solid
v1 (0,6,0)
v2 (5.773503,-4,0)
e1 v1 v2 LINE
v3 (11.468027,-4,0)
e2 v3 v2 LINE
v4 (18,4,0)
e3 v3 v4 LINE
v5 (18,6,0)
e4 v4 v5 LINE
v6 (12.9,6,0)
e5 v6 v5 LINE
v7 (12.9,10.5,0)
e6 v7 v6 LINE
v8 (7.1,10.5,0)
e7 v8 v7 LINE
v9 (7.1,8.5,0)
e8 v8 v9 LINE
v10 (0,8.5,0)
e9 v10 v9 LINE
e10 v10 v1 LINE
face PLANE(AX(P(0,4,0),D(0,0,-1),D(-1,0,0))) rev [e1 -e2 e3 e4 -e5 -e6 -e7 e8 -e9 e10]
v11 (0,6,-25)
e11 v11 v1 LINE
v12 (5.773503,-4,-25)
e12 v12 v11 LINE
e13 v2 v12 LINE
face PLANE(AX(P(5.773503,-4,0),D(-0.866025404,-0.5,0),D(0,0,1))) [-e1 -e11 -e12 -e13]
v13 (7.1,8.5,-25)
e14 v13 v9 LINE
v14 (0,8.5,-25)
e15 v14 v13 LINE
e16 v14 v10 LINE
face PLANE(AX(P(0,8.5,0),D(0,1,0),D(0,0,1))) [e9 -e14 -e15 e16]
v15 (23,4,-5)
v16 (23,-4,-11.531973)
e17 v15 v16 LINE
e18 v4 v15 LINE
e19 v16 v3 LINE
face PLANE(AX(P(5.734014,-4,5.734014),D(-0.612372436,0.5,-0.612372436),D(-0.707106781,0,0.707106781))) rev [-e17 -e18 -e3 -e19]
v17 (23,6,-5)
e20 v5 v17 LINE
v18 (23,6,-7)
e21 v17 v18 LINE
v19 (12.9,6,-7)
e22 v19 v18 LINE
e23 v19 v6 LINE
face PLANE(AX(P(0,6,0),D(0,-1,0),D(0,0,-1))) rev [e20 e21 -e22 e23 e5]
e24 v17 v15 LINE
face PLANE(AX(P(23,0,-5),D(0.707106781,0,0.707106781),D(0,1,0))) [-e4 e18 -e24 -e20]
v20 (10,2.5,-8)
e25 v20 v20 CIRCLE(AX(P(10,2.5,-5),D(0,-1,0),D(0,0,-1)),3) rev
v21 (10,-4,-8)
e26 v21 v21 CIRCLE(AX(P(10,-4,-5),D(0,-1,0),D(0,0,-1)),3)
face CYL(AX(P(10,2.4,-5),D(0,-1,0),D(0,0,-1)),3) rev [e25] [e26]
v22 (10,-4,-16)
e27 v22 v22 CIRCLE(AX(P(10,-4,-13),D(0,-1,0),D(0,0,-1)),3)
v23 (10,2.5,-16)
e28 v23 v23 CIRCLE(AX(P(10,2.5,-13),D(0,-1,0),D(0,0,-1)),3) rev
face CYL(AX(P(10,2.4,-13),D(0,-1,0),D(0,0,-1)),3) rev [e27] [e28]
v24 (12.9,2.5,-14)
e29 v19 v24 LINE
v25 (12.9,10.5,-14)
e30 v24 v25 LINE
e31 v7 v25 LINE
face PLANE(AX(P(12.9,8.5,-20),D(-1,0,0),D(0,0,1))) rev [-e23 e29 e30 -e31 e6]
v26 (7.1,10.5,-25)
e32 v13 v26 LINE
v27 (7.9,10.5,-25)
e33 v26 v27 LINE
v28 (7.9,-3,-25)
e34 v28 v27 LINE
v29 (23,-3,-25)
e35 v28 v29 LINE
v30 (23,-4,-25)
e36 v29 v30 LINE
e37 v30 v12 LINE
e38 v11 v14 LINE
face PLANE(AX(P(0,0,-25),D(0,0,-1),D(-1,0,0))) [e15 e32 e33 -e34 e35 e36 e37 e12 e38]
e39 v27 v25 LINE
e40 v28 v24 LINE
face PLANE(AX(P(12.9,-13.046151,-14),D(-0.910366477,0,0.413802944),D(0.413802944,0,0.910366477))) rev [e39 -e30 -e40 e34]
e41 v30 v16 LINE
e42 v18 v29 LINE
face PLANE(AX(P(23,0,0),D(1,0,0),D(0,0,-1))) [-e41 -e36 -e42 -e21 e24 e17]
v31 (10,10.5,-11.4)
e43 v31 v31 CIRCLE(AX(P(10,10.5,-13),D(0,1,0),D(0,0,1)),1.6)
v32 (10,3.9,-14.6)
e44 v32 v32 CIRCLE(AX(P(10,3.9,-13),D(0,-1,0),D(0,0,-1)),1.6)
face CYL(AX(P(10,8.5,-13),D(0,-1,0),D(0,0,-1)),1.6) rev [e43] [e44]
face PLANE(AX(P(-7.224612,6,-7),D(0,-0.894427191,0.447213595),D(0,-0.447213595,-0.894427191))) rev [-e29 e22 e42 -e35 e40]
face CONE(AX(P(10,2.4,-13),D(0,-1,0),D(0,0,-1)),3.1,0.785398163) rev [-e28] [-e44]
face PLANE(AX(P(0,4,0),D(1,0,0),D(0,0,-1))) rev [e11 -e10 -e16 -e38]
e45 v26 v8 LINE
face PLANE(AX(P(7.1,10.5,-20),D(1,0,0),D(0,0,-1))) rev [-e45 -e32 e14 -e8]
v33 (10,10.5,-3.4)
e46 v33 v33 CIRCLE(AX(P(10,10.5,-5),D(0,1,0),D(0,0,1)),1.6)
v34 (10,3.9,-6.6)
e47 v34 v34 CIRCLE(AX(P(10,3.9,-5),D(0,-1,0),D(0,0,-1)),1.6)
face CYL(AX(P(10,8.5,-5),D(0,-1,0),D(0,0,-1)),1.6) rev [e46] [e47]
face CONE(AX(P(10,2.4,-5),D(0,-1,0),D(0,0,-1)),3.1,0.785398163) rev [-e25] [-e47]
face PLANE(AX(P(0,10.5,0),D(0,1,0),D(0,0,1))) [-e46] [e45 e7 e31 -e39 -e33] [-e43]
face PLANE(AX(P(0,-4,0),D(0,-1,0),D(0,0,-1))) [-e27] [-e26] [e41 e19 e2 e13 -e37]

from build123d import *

# Parameters (mm, degrees)
SKETCH_1_W           = 20
SKETCH_1_H           = 20
EXTRUDE_1_DEPTH      = 4
SKETCH_2_W           = 12.9
SKETCH_2_H           = 20
EXTRUDE_2_DEPTH      = 4.5
SKETCH_3_R           = 1.6
CUT_EXTRUDE_1_DEPTH  = 30.533878851
SKETCH_4_W           = 5.8
SKETCH_4_H           = 20
SKETCH_4_R           = 1.6
EXTRUDE_3_DEPTH      = 2
SKETCH_5_R           = 3
CUT_EXTRUDE_3_DEPTH  = 2.4
SKETCH_6_W           = 20
SKETCH_6_H           = 4
EXTRUDE_4_DEPTH      = 3
EXTRUDE_START        = 4
SKETCH_7_W           = 23
SKETCH_7_H           = 20
SKETCH_7_R           = 3
EXTRUDE_5_DEPTH      = 4
SKETCH_9_W           = 10.1
SKETCH_9_H           = 20
EXTRUDE_6_DEPTH      = 2
EXTRUDE_7_DEPTH      = 5
CHAMFER_7_SIZE       = 10
CHAMFER_7_SIZE2      = 5.773502692
CHAMFER_8_SIZE       = 5
CHAMFER_9_SIZE       = 8
CHAMFER_9_SIZE2      = 4.618802154
CUT_EXTRUDE_9_DEPTH  = 10.1
CUT_EXTRUDE_10_REACH = 38.936
CHAMFER_10_SIZE      = 1.5


with BuildPart() as part:
    # 草图1 → 凸台-拉伸1 (new body)
    with BuildSketch(Plane(origin=(0, 0, 0), x_dir=(1, 0, 0), z_dir=(0, 1, 0))):
        with Locations((10, 10)):
            Rectangle(SKETCH_1_W, SKETCH_1_H)
    extrude(amount=EXTRUDE_1_DEPTH)

    # 草图2 → 凸台-拉伸2 (add)
    with BuildSketch(Plane(origin=(0, 4, 0), x_dir=(1, 0, 0), z_dir=(0, 1, 0))):
        with Locations((6.45, 10)):
            Rectangle(SKETCH_2_W, SKETCH_2_H)
    extrude(amount=EXTRUDE_2_DEPTH)

    # 草图3 → 切除-拉伸1 (cut, through all)
    with BuildSketch(Plane(origin=(0, 0, 0), x_dir=(-1, 0, 0), z_dir=(0, -1, 0))):
        with Locations(Location((-10, 5, 0), (0, 0, 90))):
            Circle(SKETCH_3_R)
        with Locations(Location((-10, 13, 0), (0, 0, 90))):
            Circle(SKETCH_3_R)
    extrude(amount=-CUT_EXTRUDE_1_DEPTH, mode=Mode.SUBTRACT)

    # 草图4 → 凸台-拉伸3 (add)
    with BuildSketch(Plane(origin=(0, 8.5, 0), x_dir=(1, 0, 0), z_dir=(0, 1, 0))):
        with Locations((10, 10)):
            Rectangle(SKETCH_4_W, SKETCH_4_H)
        with Locations(Location((10, 13, 0), (0, 0, 90))):
            Circle(SKETCH_4_R, mode=Mode.SUBTRACT)
        with Locations(Location((10, 5, 0), (0, 0, 90))):
            Circle(SKETCH_4_R, mode=Mode.SUBTRACT)
    extrude(amount=EXTRUDE_3_DEPTH)

    # 草图5 → 切除-拉伸3 (cut)
    with BuildSketch(Plane(origin=(0, 0, 0), x_dir=(-1, 0, 0), z_dir=(0, -1, 0))):
        with Locations(Location((-10, 5, 0), (0, 0, 90))):
            Circle(SKETCH_5_R)
        with Locations(Location((-10, 13, 0), (0, 0, 90))):
            Circle(SKETCH_5_R)
    extrude(amount=-CUT_EXTRUDE_3_DEPTH, mode=Mode.SUBTRACT)

    # 草图6 → 凸台-拉伸4 (add)
    with BuildSketch(Plane(origin=(20, 0, 0), x_dir=(0, 0, -1), z_dir=(1, 0, 0))):
        with Locations((10, 2)):
            Rectangle(SKETCH_6_W, SKETCH_6_H)
    extrude(amount=EXTRUDE_4_DEPTH)

    # 草图7 → 凸台-拉伸5 (add)
    with BuildSketch(Plane(origin=(0, 0, 0), x_dir=(-1, 0, 0), z_dir=(0, -1, 0)).offset(EXTRUDE_START)):
        with Locations((-11.5, 10)):
            Rectangle(SKETCH_7_W, SKETCH_7_H)
        with Locations(Location((-10, 13, 0), (0, 0, 90))):
            Circle(SKETCH_7_R, mode=Mode.SUBTRACT)
        with Locations(Location((-10, 5, 0), (0, 0, 90))):
            Circle(SKETCH_7_R, mode=Mode.SUBTRACT)
    extrude(amount=-EXTRUDE_5_DEPTH)

    # 草图9 → 凸台-拉伸6 (add)
    with BuildSketch(Plane(origin=(0, 4, 0), x_dir=(1, 0, 0), z_dir=(0, 1, 0))):
        with Locations((17.95, 10)):
            Rectangle(SKETCH_9_W, SKETCH_9_H)
    extrude(amount=EXTRUDE_6_DEPTH)

    # 草图11 → 凸台-拉伸7 (add)
    with BuildSketch(Plane(origin=(0, 0, -20), x_dir=(-1, 0, 0), z_dir=(0, 0, -1))):
        Polygon((-23, 6), (-23, -4), (0, -4), (0, 8.5), (-7.1, 8.5), (-7.1, 10.5), (-12.9, 10.5), (-12.9, 6), align=None)
    extrude(amount=EXTRUDE_7_DEPTH)

    # 倒角7
    chamfer_7_edges = [part.edges().sort_by_distance(p)[0] for p in [
        (0, -4, -12.5),
    ]]
    chamfer_7_side = [part.faces().sort_by_distance(p)[0] for p in [
        (0, 2.25, -12.5),
    ]]
    chamfer(chamfer_7_edges, length=CHAMFER_7_SIZE, length2=CHAMFER_7_SIZE2, reference=chamfer_7_side[0])

    # 倒角8
    chamfer_8_edges = [part.edges().sort_by_distance(p)[0] for p in [
        (23, 1, 0),
    ]]
    chamfer(chamfer_8_edges, length=CHAMFER_8_SIZE)

    # 倒角9
    chamfer_9_edges = [part.edges().sort_by_distance(p)[0] for p in [
        (20.5, -4, -2.5),
    ]]
    chamfer_9_side = [part.faces().sort_by_distance(p)[0] for p in [
        (20.5, 1, -2.5),
    ]]
    chamfer(chamfer_9_edges, length=CHAMFER_9_SIZE, length2=CHAMFER_9_SIZE2, reference=chamfer_9_side[0])

    # 草图15 → 切除-拉伸9 (cut)
    with BuildSketch(Plane(origin=(23, 0, 0), x_dir=(0, 0, -1), z_dir=(1, 0, 0))):
        Polygon((25, -3), (25, 6), (7, 6), align=None)
    extrude(amount=-CUT_EXTRUDE_9_DEPTH, mode=Mode.SUBTRACT)

    # 切除-拉伸10: up to this plane
    cut_extrude_10_end = Plane(origin=(-7.224611797, 6, -7), z_dir=(0, -0.894427190999916, 0.447213595499958))
    # 草图16 → 切除-拉伸10 (cut, up to the surface)
    with BuildSketch(Plane(origin=(0, 10.5, 0), x_dir=(1, 0, 0), z_dir=(0, 1, 0)), mode=Mode.PRIVATE) as cut_extrude_10_sk1:
        Polygon((7.9, 25), (12.9, 25), (12.9, 14), align=None)
    cut_extrude_10_tool1 = split(extrude(cut_extrude_10_sk1.sketch, amount=-CUT_EXTRUDE_10_REACH, mode=Mode.PRIVATE), bisect_by=cut_extrude_10_end, keep=Keep.BOTH, mode=Mode.PRIVATE)
    add(cut_extrude_10_tool1.solids().sort_by_distance((11.233333, 10.5, -21.333333))[0], mode=Mode.SUBTRACT)

    # 倒角10
    # the kernel refuses this chamfer: 1.5 mm, written as the material it takes off along each edge
    with BuildSketch(Plane(origin=(10, 2.4, -13), x_dir=(0, 0, -1), z_dir=(-1, 0, 0))) as chamfer_10_piece_1_section:
        Polygon((1.6, -CHAMFER_10_SIZE), (1.6 + CHAMFER_10_SIZE, 0), (1.6, 0), align=None)
    chamfer_10_piece_1 = revolve(axis=Axis((10, 2.4, -13), (0, -1, 0)), mode=Mode.PRIVATE)
    chamfer_10_piece_1 = chamfer_10_piece_1 & Plane(origin=(10, 3.20338318, -13), x_dir=(0, 0, -1), z_dir=(0, -1, 0)) * Cylinder(3, 13, mode=Mode.PRIVATE)
    add(chamfer_10_piece_1, mode=Mode.SUBTRACT)
    with BuildSketch(Plane(origin=(10, 2.4, -5), x_dir=(0, 0, -1), z_dir=(-1, 0, 0))) as chamfer_10_piece_2_section:
        Polygon((1.6, -CHAMFER_10_SIZE), (1.6 + CHAMFER_10_SIZE, 0), (1.6, 0), align=None)
    chamfer_10_piece_2 = revolve(axis=Axis((10, 2.4, -5), (0, -1, 0)), mode=Mode.PRIVATE)
    chamfer_10_piece_2 = chamfer_10_piece_2 & Plane(origin=(10, 3.20338318, -5), x_dir=(0, 0, -1), z_dir=(0, -1, 0)) * Cylinder(3, 13, mode=Mode.PRIVATE)
    add(chamfer_10_piece_2, mode=Mode.SUBTRACT)


solid = part.part
